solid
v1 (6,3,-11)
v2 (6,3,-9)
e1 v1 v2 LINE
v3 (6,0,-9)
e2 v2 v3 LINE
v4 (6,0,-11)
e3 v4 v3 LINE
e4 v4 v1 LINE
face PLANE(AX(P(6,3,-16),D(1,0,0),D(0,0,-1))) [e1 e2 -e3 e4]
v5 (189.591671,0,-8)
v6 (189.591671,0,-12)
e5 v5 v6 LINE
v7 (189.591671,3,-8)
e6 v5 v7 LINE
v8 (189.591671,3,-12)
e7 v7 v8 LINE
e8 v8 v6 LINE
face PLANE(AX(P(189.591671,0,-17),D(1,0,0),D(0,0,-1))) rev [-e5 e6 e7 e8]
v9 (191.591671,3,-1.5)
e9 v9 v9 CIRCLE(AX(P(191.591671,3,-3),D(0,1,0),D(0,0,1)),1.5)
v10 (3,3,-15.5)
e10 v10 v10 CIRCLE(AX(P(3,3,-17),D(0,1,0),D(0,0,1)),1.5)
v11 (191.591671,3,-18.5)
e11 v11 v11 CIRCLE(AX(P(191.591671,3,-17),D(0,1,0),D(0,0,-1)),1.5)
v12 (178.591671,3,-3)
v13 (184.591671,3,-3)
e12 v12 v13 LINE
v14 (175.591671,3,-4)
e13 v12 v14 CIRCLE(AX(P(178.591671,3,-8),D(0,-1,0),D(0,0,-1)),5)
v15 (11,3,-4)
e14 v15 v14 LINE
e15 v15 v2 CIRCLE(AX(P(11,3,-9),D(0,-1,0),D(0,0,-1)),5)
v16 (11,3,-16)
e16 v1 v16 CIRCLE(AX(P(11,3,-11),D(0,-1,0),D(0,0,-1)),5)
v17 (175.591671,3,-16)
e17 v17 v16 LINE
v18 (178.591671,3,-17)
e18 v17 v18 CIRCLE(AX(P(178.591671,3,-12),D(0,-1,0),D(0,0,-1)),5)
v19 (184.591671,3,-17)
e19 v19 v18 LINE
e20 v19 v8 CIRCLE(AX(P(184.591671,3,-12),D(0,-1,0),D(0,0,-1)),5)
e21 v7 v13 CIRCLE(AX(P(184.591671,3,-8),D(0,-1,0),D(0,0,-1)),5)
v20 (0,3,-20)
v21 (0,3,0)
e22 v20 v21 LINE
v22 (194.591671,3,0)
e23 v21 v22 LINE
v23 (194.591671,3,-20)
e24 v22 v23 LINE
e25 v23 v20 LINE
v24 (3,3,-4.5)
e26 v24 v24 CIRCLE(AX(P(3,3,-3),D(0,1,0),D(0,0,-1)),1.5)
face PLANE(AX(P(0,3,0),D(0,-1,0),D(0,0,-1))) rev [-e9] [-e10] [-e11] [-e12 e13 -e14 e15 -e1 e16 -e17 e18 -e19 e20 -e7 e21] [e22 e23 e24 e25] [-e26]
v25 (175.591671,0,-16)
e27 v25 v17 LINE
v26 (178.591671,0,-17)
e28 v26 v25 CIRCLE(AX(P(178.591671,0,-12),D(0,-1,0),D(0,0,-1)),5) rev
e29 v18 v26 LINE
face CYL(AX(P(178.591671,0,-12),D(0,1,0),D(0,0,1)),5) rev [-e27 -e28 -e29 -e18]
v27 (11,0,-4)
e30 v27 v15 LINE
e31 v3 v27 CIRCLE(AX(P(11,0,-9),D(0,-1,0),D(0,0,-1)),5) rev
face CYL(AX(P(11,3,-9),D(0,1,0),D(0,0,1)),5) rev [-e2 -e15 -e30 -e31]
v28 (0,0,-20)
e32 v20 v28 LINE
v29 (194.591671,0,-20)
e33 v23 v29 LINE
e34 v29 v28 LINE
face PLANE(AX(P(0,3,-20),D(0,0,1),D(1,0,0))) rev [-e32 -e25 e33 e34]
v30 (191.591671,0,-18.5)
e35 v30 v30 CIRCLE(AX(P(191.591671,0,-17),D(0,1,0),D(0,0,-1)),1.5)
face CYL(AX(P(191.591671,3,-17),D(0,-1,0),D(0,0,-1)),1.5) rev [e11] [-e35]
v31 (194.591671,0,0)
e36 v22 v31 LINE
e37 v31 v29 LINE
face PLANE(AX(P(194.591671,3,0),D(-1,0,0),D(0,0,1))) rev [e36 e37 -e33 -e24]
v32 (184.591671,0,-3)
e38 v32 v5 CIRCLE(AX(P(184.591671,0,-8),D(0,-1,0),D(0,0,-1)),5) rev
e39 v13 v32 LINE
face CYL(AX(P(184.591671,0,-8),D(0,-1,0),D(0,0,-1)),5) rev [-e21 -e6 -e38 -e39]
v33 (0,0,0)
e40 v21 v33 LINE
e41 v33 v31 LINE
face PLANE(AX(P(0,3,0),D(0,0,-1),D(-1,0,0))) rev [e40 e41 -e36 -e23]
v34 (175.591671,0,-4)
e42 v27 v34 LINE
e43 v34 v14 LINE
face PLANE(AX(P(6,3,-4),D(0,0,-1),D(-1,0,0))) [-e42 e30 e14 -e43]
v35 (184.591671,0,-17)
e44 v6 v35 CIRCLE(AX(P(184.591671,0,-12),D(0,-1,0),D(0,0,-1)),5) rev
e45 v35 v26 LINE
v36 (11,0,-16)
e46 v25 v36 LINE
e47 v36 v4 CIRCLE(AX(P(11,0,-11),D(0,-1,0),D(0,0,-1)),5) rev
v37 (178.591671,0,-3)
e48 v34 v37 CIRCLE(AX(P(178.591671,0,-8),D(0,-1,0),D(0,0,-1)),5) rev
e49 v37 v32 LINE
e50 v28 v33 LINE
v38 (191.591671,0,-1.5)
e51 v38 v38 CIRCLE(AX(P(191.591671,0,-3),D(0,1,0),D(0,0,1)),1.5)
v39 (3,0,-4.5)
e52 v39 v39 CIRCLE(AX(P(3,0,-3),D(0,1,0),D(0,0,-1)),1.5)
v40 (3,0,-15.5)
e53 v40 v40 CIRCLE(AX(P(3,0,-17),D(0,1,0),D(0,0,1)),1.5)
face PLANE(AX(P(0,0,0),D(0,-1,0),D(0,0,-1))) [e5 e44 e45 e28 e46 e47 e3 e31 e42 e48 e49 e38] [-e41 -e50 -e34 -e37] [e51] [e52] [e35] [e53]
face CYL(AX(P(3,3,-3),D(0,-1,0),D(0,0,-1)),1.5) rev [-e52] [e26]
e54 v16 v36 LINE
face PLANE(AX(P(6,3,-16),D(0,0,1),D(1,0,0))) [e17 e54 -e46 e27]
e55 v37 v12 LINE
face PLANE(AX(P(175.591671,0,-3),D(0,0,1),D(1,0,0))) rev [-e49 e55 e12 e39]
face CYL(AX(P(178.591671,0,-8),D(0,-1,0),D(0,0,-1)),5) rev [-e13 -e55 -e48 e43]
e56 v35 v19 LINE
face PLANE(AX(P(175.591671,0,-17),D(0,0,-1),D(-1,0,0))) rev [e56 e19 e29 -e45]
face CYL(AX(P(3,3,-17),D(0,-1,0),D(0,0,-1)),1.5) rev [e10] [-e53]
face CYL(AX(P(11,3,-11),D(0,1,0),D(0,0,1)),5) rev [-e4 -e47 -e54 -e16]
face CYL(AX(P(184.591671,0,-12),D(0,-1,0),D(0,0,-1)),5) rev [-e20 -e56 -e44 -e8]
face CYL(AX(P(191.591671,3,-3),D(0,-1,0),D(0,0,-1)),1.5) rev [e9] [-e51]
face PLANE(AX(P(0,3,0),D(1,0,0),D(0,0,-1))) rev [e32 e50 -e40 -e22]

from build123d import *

# Parameters (mm, degrees)
SKETCH1_W           = 194.591670797
SKETCH1_H           = 20
SKETCH1_R           = 1.5
SKETCH1_W_2         = 182.591670797
SKETCH1_H_2         = 12
BOSS_EXTRUDE1_DEPTH = 3
CUT_EXTRUDE1_DEPTH  = 196.639766774
FILLET1_R           = 5


with BuildPart() as part:
    # Sketch1 → Boss-Extrude1 (new body)
    with BuildSketch(Plane(origin=(0, 0, 0), x_dir=(1, 0, 0), z_dir=(0, 1, 0))):
        with Locations((97.295835399, 10)):
            Rectangle(SKETCH1_W, SKETCH1_H)
        with Locations(Location((3, 17, 0), (0, 0, 270))):
            Circle(SKETCH1_R, mode=Mode.SUBTRACT)
        with Locations(Location((3, 3, 0), (0, 0, 90))):
            Circle(SKETCH1_R, mode=Mode.SUBTRACT)
        with Locations(Location((191.591670797, 3, 0), (0, 0, 270))):
            Circle(SKETCH1_R, mode=Mode.SUBTRACT)
        with Locations(Location((191.591670797, 17, 0), (0, 0, 90))):
            Circle(SKETCH1_R, mode=Mode.SUBTRACT)
        with Locations((97.295835399, 10)):
            Rectangle(SKETCH1_W_2, SKETCH1_H_2, mode=Mode.SUBTRACT)
    extrude(amount=BOSS_EXTRUDE1_DEPTH)

    # Sketch2 → Cut-Extrude1 (cut, through all)
    with BuildSketch(Plane(origin=(0, 3, 0), x_dir=(1, 0, 0), z_dir=(0, 1, 0))):
        Polygon((175.591670797, 17), (175.591670797, 16), (188.591670797, 16), (188.591670797, 4), (175.591670797, 4), (175.591670797, 3), (189.591670797, 3), (189.591670797, 17), align=None)
    extrude(amount=-CUT_EXTRUDE1_DEPTH, mode=Mode.SUBTRACT)

    # Fillet1
    # the kernel refuses this fillet: 5 mm, written as the material it adds along each edge
    with BuildSketch(Plane(origin=(189.591670797, 3, -17), x_dir=(0, 0, 1), z_dir=(0, -1, 0)), Plane(origin=(189.591670797, 3, -3), x_dir=(-1, 0, 0), z_dir=(0, -1, 0)), Plane(origin=(6, 0, -16), x_dir=(0, 0, 1), z_dir=(0, 1, 0))) as fillet1_piece_1:
        with BuildLine():
            CenterArc((FILLET1_R, FILLET1_R), FILLET1_R, 180, 90)
            Line((0, FILLET1_R), (-FILLET1_R * 0.02, FILLET1_R))
            Line((-FILLET1_R * 0.02, FILLET1_R), (-FILLET1_R * 0.02, -FILLET1_R * 0.02))
            Line((-FILLET1_R * 0.02, -FILLET1_R * 0.02), (FILLET1_R, -FILLET1_R * 0.02))
            Line((FILLET1_R, -FILLET1_R * 0.02), (FILLET1_R, 0))
        make_face()
    extrude(amount=3)
    with BuildSketch(Plane(origin=(175.591670797, 3, -17), x_dir=(1, 0, 0), z_dir=(0, -1, 0))) as fillet1_piece_2:
        with BuildLine():
            CenterArc((3, 5), FILLET1_R, 233.130102354, 36.869897646)
            Line((0, 1), (-0.06, 0.92))
            ThreePointArc((-0.06, 0.92), (-0.1, 0.5), (-0.1, 0))
            Line((-0.1, 0), (0, -0.1))
            Line((0, -0.1), (3, -0.1))
            Line((3, -0.1), (3, 0))
        make_face()
    extrude(amount=3)
    with BuildSketch(Plane(origin=(175.591670797, 3, -3), x_dir=(0, 0, -1), z_dir=(0, -1, 0))) as fillet1_piece_3:
        with BuildLine():
            CenterArc((5, 3), FILLET1_R, 180, 36.869897646)
            Line((0, 3), (-0.1, 3))
            Line((-0.1, 3), (-0.1, 0))
            Line((-0.1, 0), (0, -0.1))
            ThreePointArc((0, -0.1), (0.5, -0.1), (0.92, -0.06))
            Line((0.92, -0.06), (1, 0))
        make_face()
    extrude(amount=3)
    with BuildSketch(Plane(origin=(6, 0, -4), x_dir=(0, 0, -1), z_dir=(0, 1, 0))) as fillet1_piece_4:
        with BuildLine():
            CenterArc((FILLET1_R, -FILLET1_R), FILLET1_R, 90, 90)
            Line((0, -FILLET1_R), (-FILLET1_R * 0.02, -FILLET1_R))
            Line((-FILLET1_R * 0.02, -FILLET1_R), (-FILLET1_R * 0.02, FILLET1_R * 0.02))
            Line((-FILLET1_R * 0.02, FILLET1_R * 0.02), (FILLET1_R, FILLET1_R * 0.02))
            Line((FILLET1_R, FILLET1_R * 0.02), (FILLET1_R, 0))
        make_face()
    extrude(amount=3)


solid = part.part
